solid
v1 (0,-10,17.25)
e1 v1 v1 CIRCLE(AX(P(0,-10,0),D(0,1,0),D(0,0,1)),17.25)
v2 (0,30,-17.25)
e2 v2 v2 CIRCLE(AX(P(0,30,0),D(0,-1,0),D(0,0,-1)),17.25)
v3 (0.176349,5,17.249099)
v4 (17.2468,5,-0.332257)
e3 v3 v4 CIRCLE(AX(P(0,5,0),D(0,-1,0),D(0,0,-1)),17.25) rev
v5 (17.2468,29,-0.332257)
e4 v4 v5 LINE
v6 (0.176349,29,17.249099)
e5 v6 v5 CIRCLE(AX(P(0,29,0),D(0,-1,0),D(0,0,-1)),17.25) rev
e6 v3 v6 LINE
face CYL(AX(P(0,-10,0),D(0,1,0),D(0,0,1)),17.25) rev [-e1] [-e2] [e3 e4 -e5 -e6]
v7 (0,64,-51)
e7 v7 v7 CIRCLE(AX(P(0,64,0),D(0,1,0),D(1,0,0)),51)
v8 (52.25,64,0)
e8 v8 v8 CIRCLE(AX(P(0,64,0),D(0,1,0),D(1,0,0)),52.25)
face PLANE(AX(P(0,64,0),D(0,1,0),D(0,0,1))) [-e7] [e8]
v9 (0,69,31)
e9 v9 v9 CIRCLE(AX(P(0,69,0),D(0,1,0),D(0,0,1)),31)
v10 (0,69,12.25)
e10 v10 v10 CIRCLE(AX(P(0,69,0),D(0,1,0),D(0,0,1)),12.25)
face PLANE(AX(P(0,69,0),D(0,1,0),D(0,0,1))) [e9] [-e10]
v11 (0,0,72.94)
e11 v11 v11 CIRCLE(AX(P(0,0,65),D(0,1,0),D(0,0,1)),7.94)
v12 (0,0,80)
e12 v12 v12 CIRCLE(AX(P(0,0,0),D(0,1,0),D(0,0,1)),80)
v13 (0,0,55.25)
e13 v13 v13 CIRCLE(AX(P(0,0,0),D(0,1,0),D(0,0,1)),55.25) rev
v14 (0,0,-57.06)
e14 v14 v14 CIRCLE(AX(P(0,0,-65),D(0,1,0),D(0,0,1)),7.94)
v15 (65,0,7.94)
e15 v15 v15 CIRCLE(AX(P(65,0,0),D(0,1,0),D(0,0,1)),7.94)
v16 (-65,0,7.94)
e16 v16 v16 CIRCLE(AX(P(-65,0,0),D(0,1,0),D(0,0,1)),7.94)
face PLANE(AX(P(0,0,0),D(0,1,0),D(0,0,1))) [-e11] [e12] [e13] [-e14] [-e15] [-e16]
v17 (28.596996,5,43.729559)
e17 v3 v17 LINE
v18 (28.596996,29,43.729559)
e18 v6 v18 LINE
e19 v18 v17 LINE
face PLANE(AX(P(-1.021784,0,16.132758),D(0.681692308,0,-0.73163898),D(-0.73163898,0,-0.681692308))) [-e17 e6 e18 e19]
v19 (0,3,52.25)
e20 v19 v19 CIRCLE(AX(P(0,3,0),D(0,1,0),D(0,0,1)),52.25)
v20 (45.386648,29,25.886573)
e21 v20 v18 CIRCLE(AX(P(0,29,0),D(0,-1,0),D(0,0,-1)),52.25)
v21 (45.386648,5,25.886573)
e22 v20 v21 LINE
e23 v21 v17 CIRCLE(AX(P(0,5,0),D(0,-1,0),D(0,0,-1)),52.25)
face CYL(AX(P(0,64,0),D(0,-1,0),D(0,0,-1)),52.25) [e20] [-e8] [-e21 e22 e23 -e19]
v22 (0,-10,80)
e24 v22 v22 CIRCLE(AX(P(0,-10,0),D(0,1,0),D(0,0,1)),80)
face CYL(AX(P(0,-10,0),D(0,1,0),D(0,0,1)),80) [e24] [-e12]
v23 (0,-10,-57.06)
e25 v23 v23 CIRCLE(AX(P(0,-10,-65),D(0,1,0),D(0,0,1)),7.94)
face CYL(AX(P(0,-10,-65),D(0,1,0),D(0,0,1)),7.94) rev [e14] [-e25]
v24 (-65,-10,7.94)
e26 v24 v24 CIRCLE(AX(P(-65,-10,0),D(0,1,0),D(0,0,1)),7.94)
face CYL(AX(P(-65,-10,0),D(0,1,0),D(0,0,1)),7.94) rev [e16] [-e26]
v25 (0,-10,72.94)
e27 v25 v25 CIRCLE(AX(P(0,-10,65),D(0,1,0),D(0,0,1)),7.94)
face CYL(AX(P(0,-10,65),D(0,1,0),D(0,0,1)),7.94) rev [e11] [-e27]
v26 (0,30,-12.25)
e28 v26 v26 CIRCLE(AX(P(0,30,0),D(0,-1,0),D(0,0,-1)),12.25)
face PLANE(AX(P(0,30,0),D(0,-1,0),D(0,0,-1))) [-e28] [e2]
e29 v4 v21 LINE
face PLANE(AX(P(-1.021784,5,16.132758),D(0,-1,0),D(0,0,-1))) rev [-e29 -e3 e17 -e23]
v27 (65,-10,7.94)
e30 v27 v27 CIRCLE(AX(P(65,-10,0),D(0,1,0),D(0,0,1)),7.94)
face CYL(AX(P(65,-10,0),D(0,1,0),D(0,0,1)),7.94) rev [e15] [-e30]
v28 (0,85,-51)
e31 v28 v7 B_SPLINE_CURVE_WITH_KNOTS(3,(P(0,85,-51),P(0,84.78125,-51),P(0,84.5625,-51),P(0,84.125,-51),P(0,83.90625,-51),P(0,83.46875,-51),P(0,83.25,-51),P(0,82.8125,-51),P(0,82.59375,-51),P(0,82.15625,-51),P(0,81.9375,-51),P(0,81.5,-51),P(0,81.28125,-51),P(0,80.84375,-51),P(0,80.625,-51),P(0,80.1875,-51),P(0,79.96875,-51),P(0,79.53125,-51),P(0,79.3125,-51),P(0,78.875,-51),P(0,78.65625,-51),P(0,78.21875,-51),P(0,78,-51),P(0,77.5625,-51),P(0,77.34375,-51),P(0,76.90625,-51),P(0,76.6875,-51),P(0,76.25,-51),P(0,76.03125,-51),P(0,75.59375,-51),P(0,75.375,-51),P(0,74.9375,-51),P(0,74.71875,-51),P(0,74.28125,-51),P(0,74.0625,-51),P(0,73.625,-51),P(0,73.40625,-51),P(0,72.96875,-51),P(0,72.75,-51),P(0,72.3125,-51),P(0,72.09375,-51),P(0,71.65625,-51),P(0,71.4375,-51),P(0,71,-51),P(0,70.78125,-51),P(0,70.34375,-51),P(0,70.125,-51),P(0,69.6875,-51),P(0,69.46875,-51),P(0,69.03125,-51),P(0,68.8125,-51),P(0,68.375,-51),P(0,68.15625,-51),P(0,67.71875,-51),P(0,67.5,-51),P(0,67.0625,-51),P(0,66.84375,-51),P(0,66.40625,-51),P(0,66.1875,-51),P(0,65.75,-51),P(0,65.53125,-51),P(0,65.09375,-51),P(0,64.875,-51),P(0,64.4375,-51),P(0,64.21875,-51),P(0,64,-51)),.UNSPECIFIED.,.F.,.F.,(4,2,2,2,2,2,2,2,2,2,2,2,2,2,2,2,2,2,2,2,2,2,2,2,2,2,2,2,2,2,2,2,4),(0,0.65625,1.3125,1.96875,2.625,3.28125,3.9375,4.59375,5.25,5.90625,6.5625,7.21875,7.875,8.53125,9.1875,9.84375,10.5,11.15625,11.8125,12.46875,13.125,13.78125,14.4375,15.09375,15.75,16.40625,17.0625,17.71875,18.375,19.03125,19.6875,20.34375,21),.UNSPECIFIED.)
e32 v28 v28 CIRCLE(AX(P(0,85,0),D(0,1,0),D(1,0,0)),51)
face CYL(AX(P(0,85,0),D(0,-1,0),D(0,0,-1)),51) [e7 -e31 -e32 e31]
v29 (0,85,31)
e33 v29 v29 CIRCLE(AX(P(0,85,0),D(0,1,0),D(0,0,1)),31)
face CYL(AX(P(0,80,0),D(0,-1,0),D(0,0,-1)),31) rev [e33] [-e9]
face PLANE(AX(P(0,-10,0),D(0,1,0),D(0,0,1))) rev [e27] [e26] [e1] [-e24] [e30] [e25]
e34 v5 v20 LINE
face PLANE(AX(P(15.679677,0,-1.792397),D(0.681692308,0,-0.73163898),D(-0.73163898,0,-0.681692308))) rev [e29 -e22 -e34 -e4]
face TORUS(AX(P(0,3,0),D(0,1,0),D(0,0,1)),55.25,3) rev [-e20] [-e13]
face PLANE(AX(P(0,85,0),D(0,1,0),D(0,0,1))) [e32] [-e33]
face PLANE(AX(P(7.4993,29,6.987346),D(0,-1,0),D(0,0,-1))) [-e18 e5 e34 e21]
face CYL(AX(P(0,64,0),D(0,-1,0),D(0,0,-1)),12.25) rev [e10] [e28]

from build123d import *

# Parameters (mm, degrees)
CROQUIS1_R                  = 52.25
CROQUIS1_R_2                = 12.25
EXTRUIR_L_MINA1_DEPTH       = 64
CROQUIS3_R                  = 80
CROQUIS3_R_2                = 17.25
SALIENTE_EXTRUIR1_DEPTH     = 10
EXTRUIR_L_MINA2_OUTLINE_R   = 51
EXTRUIR_L_MINA2_OUTLINE_R_2 = 31
EXTRUIR_L_MINA2_DEPTH       = 21
EXTRUIR_L_MINA2_2_OUTLINE_R = 31
EXTRUIR_L_MINA2_2_DEPTH     = 5
EXTRUIR_L_MINA2_START       = 16
EXTRUIR_L_MINA2_3_OUTLINE_R = 31
EXTRUIR_L_MINA2_3_DEPTH     = 5
CORTAR_EXTRUIR2_START       = -8
CROQUIS6_R                  = 31
CORTAR_EXTRUIR2_DEPTH       = 8
CORTAR_EXTRUIR4_START       = -23
CROQUIS7_R                  = 12.25
CORTAR_EXTRUIR4_DEPTH       = 23
CROQUIS8_R                  = 7.94
CORTAR_EXTRUIR5_DEPTH       = 10
REDONDEO3_R                 = 3
CORTAR_EXTRUIR6_START       = -40
CROQUIS9_R                  = 17.25
CORTAR_EXTRUIR6_DEPTH       = 40
CROQUIS10_W                 = 24.5
CROQUIS10_H                 = 16
CORTAR_EXTRUIR7_DEPTH       = 42
CROQUIS11_W                 = 24.5
CROQUIS11_H                 = 8
CORTAR_EXTRUIR8_DEPTH       = 42


# Read off the part's stored shape, not the designer's step: Extruir-Lámina2
with BuildPart() as part:
    # Croquis1 → Extruir-Lámina1 (new body)
    with BuildSketch(Plane(origin=(0, 0, 0), x_dir=(1, 0, 0), z_dir=(0, 1, 0))):
        Circle(CROQUIS1_R)
        Circle(CROQUIS1_R_2, mode=Mode.SUBTRACT)
    extrude(amount=EXTRUIR_L_MINA1_DEPTH)

    # Croquis3 → Saliente-Extruir1 (add)
    with BuildSketch(Plane(origin=(0, 0, 0), x_dir=(1, 0, 0), z_dir=(0, 1, 0))):
        with Locations(Location((0, 0, 0), (0, 0, 270))):
            Circle(CROQUIS3_R)
        with Locations(Location((0, 0, 0), (0, 0, 270))):
            Circle(CROQUIS3_R_2, mode=Mode.SUBTRACT)
    extrude(amount=-SALIENTE_EXTRUIR1_DEPTH)

    # Extruir-Lámina2 outline → Extruir-Lámina2 (add)
    with BuildSketch(Plane(origin=(0, 64, 0), x_dir=(1, 0, 0), z_dir=(0, 1, 0))):
        Circle(EXTRUIR_L_MINA2_OUTLINE_R)
        Circle(EXTRUIR_L_MINA2_OUTLINE_R_2, mode=Mode.SUBTRACT)
    extrude(amount=EXTRUIR_L_MINA2_DEPTH)

    # Extruir-L_mina2 2 outline → Extruir-L_mina2 2 (add)
    with BuildSketch(Plane(origin=(0, 64, 0), x_dir=(1, 0, 0), z_dir=(0, 1, 0))):
        Circle(EXTRUIR_L_MINA2_2_OUTLINE_R)
    extrude(amount=EXTRUIR_L_MINA2_2_DEPTH)

    # Extruir-L_mina2 3 outline → Extruir-L_mina2 3 (add)
    with BuildSketch(Plane(origin=(0, 64, 0), x_dir=(1, 0, 0), z_dir=(0, 1, 0)).offset(EXTRUIR_L_MINA2_START)):
        Circle(EXTRUIR_L_MINA2_3_OUTLINE_R)
    extrude(amount=EXTRUIR_L_MINA2_3_DEPTH)

    # Croquis6 → Cortar-Extruir2 (cut)
    with BuildSketch(Plane(origin=(0, 85, 0), x_dir=(1, 0, 0), z_dir=(0, 1, 0)).offset(CORTAR_EXTRUIR2_START)):
        with Locations(Location((0, 0, 0), (0, 0, 270))):
            Circle(CROQUIS6_R)
    extrude(amount=CORTAR_EXTRUIR2_DEPTH, mode=Mode.SUBTRACT)

    # Croquis7 → Cortar-Extruir4 (cut)
    with BuildSketch(Plane(origin=(0, 69, 0), x_dir=(1, 0, 0), z_dir=(0, 1, 0)).offset(CORTAR_EXTRUIR4_START)):
        with Locations(Location((0, 0, 0), (0, 0, 270))):
            Circle(CROQUIS7_R)
    extrude(amount=CORTAR_EXTRUIR4_DEPTH, mode=Mode.SUBTRACT)

    # Croquis8 → Cortar-Extruir5 (cut)
    with BuildSketch(Plane(origin=(0, 0, 0), x_dir=(1, 0, 0), z_dir=(0, 1, 0))):
        with Locations(Location((0, 65, 0), (0, 0, 270))):
            Circle(CROQUIS8_R)
        with Locations(Location((65, 0, 0), (0, 0, 270))):
            Circle(CROQUIS8_R)
        with Locations(Location((0, -65, 0), (0, 0, 270))):
            Circle(CROQUIS8_R)
        with Locations(Location((-65, 0, 0), (0, 0, 270))):
            Circle(CROQUIS8_R)
    extrude(amount=-CORTAR_EXTRUIR5_DEPTH, mode=Mode.SUBTRACT)

    # Redondeo3
    redondeo3_edges = [part.edges().sort_by_distance(p)[0] for p in [
        (-52.25, 0, 0),
    ]]
    fillet(redondeo3_edges, radius=REDONDEO3_R)

    # Croquis9 → Cortar-Extruir6 (cut)
    with BuildSketch(Plane(origin=(0, -10, 0), x_dir=(-1, 0, 0), z_dir=(0, -1, 0)).offset(CORTAR_EXTRUIR6_START)):
        with Locations(Location((0, 0, 0), (0, 0, 270))):
            Circle(CROQUIS9_R)
    extrude(amount=CORTAR_EXTRUIR6_DEPTH, mode=Mode.SUBTRACT)

    # Croquis10 → Cortar-Extruir7 (cut)
    with BuildSketch(Plane(origin=(38.228136726, 0, 35.618423077), x_dir=(0.6816923076923129, 0, -0.7316389803947908), z_dir=(0.7316389803947908, 0, 0.6816923076923129))):
        with Locations((-0.249897299, 21)):
            Rectangle(CROQUIS10_W, CROQUIS10_H)
    extrude(amount=-CORTAR_EXTRUIR7_DEPTH, mode=Mode.SUBTRACT)

    # Croquis11 → Cortar-Extruir8 (cut)
    with BuildSketch(Plane(origin=(38.228136726, 0, 35.618423077), x_dir=(0.6816923076923129, 0, -0.7316389803947908), z_dir=(0.7316389803947908, 0, 0.6816923076923129))):
        with Locations((-0.249897299, 9)):
            Rectangle(CROQUIS11_W, CROQUIS11_H)
    extrude(amount=-CORTAR_EXTRUIR8_DEPTH, mode=Mode.SUBTRACT)


solid = part.part
